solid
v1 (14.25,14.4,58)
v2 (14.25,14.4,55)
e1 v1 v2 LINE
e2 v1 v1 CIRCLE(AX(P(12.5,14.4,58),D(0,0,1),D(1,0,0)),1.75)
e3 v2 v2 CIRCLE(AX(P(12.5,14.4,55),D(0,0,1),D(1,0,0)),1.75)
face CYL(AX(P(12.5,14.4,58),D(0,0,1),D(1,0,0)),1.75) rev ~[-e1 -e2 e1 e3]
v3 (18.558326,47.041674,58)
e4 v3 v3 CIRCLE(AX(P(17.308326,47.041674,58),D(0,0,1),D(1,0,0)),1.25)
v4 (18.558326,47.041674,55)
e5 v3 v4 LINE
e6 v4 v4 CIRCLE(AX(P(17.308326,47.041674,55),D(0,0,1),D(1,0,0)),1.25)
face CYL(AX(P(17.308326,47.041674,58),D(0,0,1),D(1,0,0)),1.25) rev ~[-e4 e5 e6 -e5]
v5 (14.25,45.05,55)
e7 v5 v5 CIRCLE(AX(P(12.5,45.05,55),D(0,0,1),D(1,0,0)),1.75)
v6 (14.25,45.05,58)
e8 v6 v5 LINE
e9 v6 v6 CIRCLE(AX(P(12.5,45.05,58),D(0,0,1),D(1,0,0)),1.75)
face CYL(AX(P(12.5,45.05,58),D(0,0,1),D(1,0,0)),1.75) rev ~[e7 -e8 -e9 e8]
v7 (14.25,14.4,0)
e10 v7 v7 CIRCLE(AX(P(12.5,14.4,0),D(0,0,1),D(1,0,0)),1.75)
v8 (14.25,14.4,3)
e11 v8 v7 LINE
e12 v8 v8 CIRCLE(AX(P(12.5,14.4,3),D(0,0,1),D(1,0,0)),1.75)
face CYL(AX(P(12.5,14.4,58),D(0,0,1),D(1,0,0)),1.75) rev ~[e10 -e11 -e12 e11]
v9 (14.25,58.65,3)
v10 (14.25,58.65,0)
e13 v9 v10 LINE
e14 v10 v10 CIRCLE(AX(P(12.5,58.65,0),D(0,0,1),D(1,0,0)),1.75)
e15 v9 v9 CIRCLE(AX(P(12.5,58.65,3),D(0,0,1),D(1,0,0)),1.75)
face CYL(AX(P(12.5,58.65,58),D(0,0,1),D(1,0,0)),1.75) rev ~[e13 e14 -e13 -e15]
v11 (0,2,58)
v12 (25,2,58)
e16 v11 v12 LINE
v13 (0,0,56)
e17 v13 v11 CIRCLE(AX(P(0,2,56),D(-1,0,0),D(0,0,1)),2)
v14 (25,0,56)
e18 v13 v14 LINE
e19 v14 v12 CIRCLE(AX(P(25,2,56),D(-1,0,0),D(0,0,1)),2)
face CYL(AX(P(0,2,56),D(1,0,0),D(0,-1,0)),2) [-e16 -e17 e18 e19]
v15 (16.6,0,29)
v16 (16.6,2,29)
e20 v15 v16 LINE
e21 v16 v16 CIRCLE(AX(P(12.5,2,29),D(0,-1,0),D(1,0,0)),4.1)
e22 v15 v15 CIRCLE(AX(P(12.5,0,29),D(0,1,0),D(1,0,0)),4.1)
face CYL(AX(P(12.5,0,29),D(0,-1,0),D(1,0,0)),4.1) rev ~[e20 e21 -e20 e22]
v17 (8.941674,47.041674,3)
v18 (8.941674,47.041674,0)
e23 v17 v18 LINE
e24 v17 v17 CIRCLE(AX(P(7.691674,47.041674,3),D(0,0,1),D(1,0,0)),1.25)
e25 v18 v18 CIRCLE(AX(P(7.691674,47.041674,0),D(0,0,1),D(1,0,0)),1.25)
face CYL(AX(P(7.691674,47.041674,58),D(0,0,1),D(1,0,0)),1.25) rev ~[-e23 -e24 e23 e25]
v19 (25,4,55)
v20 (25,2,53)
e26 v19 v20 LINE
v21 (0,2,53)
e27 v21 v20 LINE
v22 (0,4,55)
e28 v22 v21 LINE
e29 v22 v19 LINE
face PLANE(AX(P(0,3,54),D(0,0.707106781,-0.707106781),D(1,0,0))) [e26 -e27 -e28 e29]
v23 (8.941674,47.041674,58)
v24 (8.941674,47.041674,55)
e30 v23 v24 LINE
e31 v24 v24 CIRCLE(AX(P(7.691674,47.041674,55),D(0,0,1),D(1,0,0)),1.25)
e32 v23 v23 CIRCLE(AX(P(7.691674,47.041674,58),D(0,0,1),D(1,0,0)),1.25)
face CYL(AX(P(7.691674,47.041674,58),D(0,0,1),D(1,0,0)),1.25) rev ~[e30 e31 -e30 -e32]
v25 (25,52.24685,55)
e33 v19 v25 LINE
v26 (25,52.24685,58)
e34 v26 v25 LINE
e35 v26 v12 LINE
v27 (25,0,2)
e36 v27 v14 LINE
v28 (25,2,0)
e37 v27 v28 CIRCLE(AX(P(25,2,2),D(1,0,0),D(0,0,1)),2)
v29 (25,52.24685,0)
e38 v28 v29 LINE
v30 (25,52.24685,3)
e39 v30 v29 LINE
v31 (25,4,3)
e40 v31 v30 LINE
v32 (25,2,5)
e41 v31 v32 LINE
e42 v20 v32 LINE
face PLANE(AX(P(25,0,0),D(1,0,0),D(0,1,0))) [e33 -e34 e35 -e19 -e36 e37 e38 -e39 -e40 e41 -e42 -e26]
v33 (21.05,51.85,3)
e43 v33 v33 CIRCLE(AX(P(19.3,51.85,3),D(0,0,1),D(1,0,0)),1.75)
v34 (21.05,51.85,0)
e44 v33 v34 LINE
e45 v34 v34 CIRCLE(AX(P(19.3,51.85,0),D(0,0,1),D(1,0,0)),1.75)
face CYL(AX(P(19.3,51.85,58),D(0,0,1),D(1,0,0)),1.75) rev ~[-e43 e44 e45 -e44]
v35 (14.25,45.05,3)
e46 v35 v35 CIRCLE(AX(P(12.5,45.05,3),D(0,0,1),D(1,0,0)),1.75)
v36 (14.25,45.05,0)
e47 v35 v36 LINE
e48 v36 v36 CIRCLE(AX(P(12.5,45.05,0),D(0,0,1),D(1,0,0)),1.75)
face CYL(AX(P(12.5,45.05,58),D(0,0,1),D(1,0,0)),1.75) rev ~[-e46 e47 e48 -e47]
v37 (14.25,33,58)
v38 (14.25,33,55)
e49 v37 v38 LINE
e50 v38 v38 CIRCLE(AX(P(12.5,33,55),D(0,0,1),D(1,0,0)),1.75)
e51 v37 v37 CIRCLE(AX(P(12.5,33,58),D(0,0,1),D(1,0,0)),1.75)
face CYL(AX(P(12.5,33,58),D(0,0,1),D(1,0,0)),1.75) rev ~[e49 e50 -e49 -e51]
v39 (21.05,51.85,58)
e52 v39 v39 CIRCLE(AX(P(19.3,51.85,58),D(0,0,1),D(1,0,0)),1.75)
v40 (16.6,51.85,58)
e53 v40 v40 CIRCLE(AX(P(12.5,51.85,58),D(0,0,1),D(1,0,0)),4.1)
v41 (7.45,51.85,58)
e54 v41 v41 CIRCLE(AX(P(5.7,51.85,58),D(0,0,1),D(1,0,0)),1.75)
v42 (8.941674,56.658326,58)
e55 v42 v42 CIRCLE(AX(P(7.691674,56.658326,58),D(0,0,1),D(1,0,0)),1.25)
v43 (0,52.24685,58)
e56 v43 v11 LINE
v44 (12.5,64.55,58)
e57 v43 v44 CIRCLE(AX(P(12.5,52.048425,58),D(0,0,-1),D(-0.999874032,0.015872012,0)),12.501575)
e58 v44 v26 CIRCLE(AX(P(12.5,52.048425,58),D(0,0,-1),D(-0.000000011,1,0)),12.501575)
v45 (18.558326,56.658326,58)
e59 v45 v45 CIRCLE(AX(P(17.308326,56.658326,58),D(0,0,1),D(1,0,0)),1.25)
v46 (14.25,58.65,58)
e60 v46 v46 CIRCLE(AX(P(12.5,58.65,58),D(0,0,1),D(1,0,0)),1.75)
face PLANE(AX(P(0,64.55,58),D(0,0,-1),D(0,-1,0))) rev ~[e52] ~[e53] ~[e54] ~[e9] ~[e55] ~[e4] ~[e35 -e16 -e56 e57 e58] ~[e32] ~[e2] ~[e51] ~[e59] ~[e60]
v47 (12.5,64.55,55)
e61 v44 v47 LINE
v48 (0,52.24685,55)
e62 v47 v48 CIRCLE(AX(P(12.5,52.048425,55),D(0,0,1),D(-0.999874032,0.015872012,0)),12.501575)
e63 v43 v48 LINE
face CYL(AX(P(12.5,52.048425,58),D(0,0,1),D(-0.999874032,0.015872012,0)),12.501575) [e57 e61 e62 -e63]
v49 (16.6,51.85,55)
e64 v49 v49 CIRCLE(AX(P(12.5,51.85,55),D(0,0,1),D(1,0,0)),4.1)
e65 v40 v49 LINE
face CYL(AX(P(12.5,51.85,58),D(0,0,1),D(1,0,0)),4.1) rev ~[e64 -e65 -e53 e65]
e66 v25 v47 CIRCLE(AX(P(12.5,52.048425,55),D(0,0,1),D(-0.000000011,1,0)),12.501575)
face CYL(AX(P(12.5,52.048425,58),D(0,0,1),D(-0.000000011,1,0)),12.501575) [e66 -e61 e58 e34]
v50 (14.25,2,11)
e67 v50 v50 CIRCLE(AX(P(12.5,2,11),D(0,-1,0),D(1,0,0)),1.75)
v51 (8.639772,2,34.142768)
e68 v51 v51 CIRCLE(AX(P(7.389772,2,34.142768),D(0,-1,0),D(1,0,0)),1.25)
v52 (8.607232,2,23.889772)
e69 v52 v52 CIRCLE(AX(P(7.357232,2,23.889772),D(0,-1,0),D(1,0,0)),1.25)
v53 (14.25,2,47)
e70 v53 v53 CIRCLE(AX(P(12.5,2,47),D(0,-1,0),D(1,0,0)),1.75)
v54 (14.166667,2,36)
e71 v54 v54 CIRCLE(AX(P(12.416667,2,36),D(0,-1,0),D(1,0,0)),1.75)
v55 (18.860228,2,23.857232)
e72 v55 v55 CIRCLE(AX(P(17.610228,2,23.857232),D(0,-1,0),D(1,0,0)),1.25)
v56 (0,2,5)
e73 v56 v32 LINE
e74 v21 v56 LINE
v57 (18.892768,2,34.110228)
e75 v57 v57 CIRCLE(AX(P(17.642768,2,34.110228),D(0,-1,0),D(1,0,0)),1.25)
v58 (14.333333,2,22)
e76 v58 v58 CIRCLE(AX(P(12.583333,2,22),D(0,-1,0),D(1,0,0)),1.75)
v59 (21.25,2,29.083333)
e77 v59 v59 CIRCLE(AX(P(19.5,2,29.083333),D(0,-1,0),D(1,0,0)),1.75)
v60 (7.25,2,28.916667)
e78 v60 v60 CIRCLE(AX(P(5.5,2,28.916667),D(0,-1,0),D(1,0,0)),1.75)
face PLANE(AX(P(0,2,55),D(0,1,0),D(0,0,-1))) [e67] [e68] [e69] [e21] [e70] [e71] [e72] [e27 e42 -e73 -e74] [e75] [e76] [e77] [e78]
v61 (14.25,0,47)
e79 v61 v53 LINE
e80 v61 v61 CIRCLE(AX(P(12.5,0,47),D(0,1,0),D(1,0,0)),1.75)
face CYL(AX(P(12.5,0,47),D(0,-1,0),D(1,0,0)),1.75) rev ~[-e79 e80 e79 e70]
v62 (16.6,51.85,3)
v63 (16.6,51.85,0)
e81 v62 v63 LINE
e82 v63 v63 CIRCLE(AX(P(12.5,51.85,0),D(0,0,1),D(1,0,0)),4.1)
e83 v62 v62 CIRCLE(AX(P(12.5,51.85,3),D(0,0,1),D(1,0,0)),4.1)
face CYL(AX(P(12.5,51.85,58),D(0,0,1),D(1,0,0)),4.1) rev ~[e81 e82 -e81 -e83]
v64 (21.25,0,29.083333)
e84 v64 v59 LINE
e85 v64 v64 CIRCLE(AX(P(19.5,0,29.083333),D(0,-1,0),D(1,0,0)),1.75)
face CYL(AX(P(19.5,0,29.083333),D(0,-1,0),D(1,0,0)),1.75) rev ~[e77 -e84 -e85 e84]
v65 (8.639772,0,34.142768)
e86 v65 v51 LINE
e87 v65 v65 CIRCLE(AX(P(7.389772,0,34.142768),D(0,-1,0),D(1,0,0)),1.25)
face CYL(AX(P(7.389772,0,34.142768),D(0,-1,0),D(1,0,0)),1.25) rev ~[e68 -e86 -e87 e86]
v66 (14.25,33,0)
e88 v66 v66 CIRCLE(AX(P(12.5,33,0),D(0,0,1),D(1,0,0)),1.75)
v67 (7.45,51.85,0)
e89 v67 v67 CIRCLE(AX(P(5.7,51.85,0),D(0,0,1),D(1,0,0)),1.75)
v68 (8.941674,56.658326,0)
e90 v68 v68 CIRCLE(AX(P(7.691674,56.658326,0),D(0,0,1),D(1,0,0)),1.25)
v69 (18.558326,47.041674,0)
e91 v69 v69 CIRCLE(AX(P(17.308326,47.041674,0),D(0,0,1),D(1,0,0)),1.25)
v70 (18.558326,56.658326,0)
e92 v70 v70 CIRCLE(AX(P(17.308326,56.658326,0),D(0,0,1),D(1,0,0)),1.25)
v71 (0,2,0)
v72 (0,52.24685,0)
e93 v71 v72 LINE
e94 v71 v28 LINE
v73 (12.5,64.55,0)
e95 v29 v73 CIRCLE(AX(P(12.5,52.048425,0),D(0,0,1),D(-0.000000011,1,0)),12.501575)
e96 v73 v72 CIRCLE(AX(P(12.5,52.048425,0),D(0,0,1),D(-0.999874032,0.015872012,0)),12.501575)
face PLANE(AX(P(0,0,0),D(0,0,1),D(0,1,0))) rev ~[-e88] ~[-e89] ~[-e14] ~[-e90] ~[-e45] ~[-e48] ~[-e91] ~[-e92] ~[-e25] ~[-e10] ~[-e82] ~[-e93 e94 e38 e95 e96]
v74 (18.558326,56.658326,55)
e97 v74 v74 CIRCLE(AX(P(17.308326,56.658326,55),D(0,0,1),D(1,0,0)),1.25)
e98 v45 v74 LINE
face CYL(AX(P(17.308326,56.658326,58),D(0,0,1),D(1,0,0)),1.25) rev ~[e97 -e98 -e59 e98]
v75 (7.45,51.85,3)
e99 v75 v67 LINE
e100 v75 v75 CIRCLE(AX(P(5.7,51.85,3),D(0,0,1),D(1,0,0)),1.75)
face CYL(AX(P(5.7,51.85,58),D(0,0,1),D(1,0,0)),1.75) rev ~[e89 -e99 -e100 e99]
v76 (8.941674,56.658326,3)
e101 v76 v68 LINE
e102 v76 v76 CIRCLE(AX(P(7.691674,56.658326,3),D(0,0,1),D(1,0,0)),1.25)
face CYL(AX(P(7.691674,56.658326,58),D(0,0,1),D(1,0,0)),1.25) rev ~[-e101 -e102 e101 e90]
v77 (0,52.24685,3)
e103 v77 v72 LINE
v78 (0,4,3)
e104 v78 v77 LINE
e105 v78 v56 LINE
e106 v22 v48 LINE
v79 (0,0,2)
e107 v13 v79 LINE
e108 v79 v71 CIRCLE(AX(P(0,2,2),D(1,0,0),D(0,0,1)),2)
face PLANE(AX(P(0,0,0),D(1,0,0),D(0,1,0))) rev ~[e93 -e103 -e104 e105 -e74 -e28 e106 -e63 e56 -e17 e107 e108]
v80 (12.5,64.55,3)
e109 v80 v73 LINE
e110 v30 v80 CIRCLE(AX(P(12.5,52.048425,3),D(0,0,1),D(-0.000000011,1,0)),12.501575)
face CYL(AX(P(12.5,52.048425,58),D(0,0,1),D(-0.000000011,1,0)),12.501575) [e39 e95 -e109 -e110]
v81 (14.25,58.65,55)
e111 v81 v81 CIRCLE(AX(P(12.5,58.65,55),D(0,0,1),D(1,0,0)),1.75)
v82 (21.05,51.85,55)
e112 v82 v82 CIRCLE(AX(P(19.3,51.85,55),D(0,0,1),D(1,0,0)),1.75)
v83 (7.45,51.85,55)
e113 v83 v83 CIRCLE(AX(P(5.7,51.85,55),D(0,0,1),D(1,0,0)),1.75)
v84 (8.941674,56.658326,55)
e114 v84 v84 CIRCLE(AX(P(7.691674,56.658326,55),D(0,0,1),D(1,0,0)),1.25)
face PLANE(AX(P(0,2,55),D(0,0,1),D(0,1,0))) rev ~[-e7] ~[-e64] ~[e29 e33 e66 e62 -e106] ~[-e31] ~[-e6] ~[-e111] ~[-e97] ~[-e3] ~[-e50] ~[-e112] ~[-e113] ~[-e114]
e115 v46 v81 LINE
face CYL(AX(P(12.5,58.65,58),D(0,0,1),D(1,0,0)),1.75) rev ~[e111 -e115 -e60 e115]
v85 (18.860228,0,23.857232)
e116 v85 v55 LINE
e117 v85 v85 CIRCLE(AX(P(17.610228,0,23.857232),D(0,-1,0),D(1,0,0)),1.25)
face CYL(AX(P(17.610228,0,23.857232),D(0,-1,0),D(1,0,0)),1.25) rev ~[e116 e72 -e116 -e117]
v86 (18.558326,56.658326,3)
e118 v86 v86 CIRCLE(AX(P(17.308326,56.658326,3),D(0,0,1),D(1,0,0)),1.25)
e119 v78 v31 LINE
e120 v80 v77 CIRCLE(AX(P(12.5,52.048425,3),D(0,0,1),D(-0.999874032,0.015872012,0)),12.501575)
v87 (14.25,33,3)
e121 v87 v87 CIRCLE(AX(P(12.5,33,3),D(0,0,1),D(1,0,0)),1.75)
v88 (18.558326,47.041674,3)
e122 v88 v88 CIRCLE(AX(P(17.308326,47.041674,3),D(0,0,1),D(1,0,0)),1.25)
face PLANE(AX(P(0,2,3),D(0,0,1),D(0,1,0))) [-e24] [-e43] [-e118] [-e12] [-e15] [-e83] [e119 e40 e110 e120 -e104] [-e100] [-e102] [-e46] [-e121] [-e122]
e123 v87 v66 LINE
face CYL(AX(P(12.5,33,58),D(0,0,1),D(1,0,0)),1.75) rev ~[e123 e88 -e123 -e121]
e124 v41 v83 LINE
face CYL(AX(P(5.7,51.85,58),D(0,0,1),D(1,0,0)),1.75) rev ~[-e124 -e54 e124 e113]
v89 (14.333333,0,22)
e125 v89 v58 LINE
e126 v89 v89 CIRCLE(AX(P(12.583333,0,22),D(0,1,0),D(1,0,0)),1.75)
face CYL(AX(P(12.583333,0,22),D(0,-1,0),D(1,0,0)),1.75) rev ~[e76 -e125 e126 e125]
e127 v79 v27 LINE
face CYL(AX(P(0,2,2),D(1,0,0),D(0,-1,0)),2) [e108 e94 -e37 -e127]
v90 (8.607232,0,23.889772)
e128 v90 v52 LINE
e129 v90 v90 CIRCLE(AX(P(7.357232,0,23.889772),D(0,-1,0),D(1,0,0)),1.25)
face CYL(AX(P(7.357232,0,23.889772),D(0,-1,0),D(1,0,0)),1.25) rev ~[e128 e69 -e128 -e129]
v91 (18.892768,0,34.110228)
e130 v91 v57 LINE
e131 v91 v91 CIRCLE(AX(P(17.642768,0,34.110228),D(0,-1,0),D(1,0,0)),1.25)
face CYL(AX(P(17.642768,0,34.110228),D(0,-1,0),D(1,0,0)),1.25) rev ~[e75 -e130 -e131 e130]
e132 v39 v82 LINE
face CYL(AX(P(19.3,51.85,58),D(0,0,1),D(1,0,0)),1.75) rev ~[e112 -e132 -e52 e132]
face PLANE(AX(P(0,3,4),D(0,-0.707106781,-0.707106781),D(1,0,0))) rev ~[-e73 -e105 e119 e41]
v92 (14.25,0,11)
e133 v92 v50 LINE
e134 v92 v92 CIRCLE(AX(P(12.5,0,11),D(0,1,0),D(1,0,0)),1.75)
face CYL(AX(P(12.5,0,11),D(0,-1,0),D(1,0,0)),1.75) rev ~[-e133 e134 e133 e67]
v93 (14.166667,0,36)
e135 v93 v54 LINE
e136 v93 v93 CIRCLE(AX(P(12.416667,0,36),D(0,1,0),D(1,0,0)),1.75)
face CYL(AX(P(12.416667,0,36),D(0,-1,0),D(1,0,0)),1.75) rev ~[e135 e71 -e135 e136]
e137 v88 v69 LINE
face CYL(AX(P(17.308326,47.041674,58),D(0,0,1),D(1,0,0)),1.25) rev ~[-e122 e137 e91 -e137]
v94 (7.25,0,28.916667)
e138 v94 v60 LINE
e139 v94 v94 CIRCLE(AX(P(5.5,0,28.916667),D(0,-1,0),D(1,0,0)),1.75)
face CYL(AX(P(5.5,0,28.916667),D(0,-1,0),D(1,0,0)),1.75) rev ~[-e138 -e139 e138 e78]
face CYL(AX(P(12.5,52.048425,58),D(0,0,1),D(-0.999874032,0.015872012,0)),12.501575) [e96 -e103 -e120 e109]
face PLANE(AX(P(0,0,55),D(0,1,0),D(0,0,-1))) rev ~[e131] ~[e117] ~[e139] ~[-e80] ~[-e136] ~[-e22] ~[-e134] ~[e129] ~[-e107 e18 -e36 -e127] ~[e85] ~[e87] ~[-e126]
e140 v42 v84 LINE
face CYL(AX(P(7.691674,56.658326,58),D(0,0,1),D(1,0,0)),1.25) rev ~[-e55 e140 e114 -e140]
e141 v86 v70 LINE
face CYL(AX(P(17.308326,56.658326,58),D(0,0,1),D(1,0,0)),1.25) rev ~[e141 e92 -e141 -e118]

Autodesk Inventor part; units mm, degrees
ref_plane "YZ Plane" through (0, 0, 0) normal (1, 0, 0) x (0, 1, 0)
ref_plane "XZ Plane" through (0, 0, 0) normal (0, 1, 0) x (-1, 0, 0)
ref_plane "XY Plane" through (0, 0, 0) normal (0, 0, 1) x (1, 0, 0)
sketch "Esboço1" plane through (0, 0, 0) normal (1, 0, 0) x (0, 1, 0)
  line L0 (0, 0) -> (64.55, 0)
  line L1 (64.55, 0) -> (64.55, 3)
  line L2 (64.55, 55) -> (64.55, 58)
  line L3 (64.55, 58) -> (0, 58)
  line L4 (0, 58) -> (0, 0)
  line L5 (0, 58) -> (0, 55)
  line L6 (2, 55) -> (2, 3)
  line L7 (2, 3) -> (64.55, 3)
  line L8 (2, 55) -> (64.55, 55)
  dimension "d6" = 64.55
  dimension "d7" = 58
  dimension "d81" = 64.55
  dimension "d83" = 2
  dimension "d84" = 52
  dimension "d85" = 62.55
  dimension "d86" = 62.55
  dimension "d111" = 3
  dimension "d112" = 3
extrude "Extrusão1" add sketch "Esboço1" along normal blind 25
sketch "Esboço2" plane through (0, 0, 58) normal (0, 0, 1) x (1, 0, 0)
  line L0 (0, 0) -> (25, 0)
  circle A0 centre (12.5, 14.4) radius 1.75
  circle A1 centre (12.5, 51.85) radius 4.1
  circle A2 centre (12.5, 45.05) radius 1.75
  line L1 (12.5, 51.85) -> (16.5, 51.85) construction
  line L2 (12.5, 51.85) -> (19.3, 51.85) construction
  circle A3 centre (7.691674, 47.041674) radius 1.25
  circle A4 centre (19.3, 51.85) radius 1.75
  circle A5 centre (12.5, 58.65) radius 1.75
  circle A6 centre (5.7, 51.85) radius 1.75
  circle A7 centre (17.308326, 47.041674) radius 1.25
  circle A8 centre (17.308326, 56.658326) radius 1.25
  circle A9 centre (7.691674, 56.658326) radius 1.25
  line L3 (0, 0) -> (25, 0)
  line L4 (25, 2) -> (25, 64.55)
  line L5 (0, 31) -> (0, 64.55)
  line L6 (0, 64.55) -> (25, 64.55)
  line L7 (25, 64.55) -> (25, 31)
  circle A10 centre (12.5, 33) radius 1.75
  line L8 (29.4167, 51.85) -> (-4.4167, 51.85)
  arc A11 (25, 51.85) -> (0, 51.85) centre (12.5, 52.048425) ccw
  point P0 (12.5, 0)
  point P1 (12.5, 64.55)
  point P2 (12.5, 0)
  point P3 (12.5, 0)
  point P4 (0, 52.24685)
  point P5 (25, 52.24685)
  dimension "d11" = 3.5
  dimension "d42" = 2.5
  dimension "d53" = 360
  dimension "d59" = 360
  dimension "d88" = 12.7
  dimension "d89" = 14.4
  dimension "d94" = 3.5
  dimension "d95" = 33
  dimension "d113" = 3.5
  dimension "d114" = 8.2
sketch "Esboço2 outline for Extrusão2" plane through (0, 0, 58) normal (0, 0, 1) x (1, 0, 0)
  circle A0 centre (12.5, 14.4) radius 1.75
  circle A1 centre (12.5, 51.85) radius 4.1
  circle A2 centre (12.5, 45.05) radius 1.75
  circle A3 centre (7.691674, 47.041674) radius 1.25
  circle A4 centre (17.308326, 47.041674) radius 1.25
  circle A5 centre (17.308326, 56.658326) radius 1.25
  circle A6 centre (12.5, 58.65) radius 1.75
  circle A7 centre (5.7, 51.85) radius 1.75
  circle A8 centre (7.691674, 56.658326) radius 1.25
  circle A9 centre (19.3, 51.85) radius 1.75
  circle A10 centre (12.5, 33) radius 1.75
  arc A11 (0, 52.24685) -> (12.5, 64.55) centre (12.5, 52.048425) cw
  line L0 (0, 64.55) -> (0, 52.24685)
  line L1 (12.5, 64.55) -> (0, 64.55)
  arc A12 (12.5, 64.55) -> (25, 52.24685) centre (12.5, 52.048425) cw
  line L2 (25, 64.55) -> (12.5, 64.55)
  line L3 (25, 52.24685) -> (25, 64.55)
extrude "Extrusão2" cut sketch "Esboço2 outline for Extrusão2" against normal through all
sketch "Esboço4" plane through (0, 0, 0) normal (0, -1, 0) x (1, 0, 0)
  line L0 (0, 58) -> (25, 58)
  line L1 (14.25, 0) -> (10.75, 0)
  line L2 (25, 2) -> (25, 54)
  line L3 (0, 2) -> (0, 54)
  circle A0 centre (12.5, 29) radius 4.1
  circle A1 centre (12.583333, 22) radius 1.75
  line L4 (12.5, 29) -> (16.5, 29) construction
  line L5 (12.5, 29) -> (19.3, 29) construction
  circle A2 centre (7.357232, 23.889772) radius 1.25
  circle A3 centre (19.5, 29.083333) radius 1.75
  circle A4 centre (12.416667, 36) radius 1.75
  circle A5 centre (5.5, 28.916667) radius 1.75
  circle A6 centre (17.610228, 23.857232) radius 1.25
  circle A7 centre (17.642768, 34.110228) radius 1.25
  circle A8 centre (7.389772, 34.142768) radius 1.25
  line L6 (0, 0) -> (25, 0)
  circle A9 centre (12.5, 47) radius 1.75
  circle A10 centre (12.5, 11) radius 1.75
  line L7 (25, 0) -> (25, 1)
  line L8 (25, 58) -> (25, 0)
  line L9 (25, 58) -> (25, 57)
  line L10 (25, 57) -> (25, 2)
  line L11 (12.5, 0) -> (12.5, 58)
  point P0 (24.956484, 28.030424)
  dimension "d68" = 8.2
  dimension "d69" = 3.5
  dimension "d70" = 2.5
  dimension "d72" = 360
  dimension "d74" = 360
  dimension "d97" = 29
  dimension "d109" = 3.5
  dimension "d110" = 3.5
  dimension "d118" = 11
  dimension "d124" = 11
  dimension "d125" = 5.5
  dimension "d126" = 5.5
  dimension "d127" = 12.5
  dimension "d128" = 12.5
  dimension "d129" = 12.5
  dimension "d130" = 12.5
extrude "Extrusão3" cut sketch "Esboço4" against normal through all contours L11 A9 | A9 L11 | L11 A4 | A4 L11 | L11 A0 | A0 L11 | L11 A1 | A1 L11 | L11 A10 | A10 L11 | A2 | A3 | A5 | A6 | A7 | A8
fillet "Arredondamento1" radius 2 2 edges at (12.5, 0, 0) (12.5, 0, 58)
chamfer "Chanfro1" distance 2 angle 45 2 edges at (12.5, 2, 55) (12.5, 2, 3)
properties part number "long FrameARRUMADO"
